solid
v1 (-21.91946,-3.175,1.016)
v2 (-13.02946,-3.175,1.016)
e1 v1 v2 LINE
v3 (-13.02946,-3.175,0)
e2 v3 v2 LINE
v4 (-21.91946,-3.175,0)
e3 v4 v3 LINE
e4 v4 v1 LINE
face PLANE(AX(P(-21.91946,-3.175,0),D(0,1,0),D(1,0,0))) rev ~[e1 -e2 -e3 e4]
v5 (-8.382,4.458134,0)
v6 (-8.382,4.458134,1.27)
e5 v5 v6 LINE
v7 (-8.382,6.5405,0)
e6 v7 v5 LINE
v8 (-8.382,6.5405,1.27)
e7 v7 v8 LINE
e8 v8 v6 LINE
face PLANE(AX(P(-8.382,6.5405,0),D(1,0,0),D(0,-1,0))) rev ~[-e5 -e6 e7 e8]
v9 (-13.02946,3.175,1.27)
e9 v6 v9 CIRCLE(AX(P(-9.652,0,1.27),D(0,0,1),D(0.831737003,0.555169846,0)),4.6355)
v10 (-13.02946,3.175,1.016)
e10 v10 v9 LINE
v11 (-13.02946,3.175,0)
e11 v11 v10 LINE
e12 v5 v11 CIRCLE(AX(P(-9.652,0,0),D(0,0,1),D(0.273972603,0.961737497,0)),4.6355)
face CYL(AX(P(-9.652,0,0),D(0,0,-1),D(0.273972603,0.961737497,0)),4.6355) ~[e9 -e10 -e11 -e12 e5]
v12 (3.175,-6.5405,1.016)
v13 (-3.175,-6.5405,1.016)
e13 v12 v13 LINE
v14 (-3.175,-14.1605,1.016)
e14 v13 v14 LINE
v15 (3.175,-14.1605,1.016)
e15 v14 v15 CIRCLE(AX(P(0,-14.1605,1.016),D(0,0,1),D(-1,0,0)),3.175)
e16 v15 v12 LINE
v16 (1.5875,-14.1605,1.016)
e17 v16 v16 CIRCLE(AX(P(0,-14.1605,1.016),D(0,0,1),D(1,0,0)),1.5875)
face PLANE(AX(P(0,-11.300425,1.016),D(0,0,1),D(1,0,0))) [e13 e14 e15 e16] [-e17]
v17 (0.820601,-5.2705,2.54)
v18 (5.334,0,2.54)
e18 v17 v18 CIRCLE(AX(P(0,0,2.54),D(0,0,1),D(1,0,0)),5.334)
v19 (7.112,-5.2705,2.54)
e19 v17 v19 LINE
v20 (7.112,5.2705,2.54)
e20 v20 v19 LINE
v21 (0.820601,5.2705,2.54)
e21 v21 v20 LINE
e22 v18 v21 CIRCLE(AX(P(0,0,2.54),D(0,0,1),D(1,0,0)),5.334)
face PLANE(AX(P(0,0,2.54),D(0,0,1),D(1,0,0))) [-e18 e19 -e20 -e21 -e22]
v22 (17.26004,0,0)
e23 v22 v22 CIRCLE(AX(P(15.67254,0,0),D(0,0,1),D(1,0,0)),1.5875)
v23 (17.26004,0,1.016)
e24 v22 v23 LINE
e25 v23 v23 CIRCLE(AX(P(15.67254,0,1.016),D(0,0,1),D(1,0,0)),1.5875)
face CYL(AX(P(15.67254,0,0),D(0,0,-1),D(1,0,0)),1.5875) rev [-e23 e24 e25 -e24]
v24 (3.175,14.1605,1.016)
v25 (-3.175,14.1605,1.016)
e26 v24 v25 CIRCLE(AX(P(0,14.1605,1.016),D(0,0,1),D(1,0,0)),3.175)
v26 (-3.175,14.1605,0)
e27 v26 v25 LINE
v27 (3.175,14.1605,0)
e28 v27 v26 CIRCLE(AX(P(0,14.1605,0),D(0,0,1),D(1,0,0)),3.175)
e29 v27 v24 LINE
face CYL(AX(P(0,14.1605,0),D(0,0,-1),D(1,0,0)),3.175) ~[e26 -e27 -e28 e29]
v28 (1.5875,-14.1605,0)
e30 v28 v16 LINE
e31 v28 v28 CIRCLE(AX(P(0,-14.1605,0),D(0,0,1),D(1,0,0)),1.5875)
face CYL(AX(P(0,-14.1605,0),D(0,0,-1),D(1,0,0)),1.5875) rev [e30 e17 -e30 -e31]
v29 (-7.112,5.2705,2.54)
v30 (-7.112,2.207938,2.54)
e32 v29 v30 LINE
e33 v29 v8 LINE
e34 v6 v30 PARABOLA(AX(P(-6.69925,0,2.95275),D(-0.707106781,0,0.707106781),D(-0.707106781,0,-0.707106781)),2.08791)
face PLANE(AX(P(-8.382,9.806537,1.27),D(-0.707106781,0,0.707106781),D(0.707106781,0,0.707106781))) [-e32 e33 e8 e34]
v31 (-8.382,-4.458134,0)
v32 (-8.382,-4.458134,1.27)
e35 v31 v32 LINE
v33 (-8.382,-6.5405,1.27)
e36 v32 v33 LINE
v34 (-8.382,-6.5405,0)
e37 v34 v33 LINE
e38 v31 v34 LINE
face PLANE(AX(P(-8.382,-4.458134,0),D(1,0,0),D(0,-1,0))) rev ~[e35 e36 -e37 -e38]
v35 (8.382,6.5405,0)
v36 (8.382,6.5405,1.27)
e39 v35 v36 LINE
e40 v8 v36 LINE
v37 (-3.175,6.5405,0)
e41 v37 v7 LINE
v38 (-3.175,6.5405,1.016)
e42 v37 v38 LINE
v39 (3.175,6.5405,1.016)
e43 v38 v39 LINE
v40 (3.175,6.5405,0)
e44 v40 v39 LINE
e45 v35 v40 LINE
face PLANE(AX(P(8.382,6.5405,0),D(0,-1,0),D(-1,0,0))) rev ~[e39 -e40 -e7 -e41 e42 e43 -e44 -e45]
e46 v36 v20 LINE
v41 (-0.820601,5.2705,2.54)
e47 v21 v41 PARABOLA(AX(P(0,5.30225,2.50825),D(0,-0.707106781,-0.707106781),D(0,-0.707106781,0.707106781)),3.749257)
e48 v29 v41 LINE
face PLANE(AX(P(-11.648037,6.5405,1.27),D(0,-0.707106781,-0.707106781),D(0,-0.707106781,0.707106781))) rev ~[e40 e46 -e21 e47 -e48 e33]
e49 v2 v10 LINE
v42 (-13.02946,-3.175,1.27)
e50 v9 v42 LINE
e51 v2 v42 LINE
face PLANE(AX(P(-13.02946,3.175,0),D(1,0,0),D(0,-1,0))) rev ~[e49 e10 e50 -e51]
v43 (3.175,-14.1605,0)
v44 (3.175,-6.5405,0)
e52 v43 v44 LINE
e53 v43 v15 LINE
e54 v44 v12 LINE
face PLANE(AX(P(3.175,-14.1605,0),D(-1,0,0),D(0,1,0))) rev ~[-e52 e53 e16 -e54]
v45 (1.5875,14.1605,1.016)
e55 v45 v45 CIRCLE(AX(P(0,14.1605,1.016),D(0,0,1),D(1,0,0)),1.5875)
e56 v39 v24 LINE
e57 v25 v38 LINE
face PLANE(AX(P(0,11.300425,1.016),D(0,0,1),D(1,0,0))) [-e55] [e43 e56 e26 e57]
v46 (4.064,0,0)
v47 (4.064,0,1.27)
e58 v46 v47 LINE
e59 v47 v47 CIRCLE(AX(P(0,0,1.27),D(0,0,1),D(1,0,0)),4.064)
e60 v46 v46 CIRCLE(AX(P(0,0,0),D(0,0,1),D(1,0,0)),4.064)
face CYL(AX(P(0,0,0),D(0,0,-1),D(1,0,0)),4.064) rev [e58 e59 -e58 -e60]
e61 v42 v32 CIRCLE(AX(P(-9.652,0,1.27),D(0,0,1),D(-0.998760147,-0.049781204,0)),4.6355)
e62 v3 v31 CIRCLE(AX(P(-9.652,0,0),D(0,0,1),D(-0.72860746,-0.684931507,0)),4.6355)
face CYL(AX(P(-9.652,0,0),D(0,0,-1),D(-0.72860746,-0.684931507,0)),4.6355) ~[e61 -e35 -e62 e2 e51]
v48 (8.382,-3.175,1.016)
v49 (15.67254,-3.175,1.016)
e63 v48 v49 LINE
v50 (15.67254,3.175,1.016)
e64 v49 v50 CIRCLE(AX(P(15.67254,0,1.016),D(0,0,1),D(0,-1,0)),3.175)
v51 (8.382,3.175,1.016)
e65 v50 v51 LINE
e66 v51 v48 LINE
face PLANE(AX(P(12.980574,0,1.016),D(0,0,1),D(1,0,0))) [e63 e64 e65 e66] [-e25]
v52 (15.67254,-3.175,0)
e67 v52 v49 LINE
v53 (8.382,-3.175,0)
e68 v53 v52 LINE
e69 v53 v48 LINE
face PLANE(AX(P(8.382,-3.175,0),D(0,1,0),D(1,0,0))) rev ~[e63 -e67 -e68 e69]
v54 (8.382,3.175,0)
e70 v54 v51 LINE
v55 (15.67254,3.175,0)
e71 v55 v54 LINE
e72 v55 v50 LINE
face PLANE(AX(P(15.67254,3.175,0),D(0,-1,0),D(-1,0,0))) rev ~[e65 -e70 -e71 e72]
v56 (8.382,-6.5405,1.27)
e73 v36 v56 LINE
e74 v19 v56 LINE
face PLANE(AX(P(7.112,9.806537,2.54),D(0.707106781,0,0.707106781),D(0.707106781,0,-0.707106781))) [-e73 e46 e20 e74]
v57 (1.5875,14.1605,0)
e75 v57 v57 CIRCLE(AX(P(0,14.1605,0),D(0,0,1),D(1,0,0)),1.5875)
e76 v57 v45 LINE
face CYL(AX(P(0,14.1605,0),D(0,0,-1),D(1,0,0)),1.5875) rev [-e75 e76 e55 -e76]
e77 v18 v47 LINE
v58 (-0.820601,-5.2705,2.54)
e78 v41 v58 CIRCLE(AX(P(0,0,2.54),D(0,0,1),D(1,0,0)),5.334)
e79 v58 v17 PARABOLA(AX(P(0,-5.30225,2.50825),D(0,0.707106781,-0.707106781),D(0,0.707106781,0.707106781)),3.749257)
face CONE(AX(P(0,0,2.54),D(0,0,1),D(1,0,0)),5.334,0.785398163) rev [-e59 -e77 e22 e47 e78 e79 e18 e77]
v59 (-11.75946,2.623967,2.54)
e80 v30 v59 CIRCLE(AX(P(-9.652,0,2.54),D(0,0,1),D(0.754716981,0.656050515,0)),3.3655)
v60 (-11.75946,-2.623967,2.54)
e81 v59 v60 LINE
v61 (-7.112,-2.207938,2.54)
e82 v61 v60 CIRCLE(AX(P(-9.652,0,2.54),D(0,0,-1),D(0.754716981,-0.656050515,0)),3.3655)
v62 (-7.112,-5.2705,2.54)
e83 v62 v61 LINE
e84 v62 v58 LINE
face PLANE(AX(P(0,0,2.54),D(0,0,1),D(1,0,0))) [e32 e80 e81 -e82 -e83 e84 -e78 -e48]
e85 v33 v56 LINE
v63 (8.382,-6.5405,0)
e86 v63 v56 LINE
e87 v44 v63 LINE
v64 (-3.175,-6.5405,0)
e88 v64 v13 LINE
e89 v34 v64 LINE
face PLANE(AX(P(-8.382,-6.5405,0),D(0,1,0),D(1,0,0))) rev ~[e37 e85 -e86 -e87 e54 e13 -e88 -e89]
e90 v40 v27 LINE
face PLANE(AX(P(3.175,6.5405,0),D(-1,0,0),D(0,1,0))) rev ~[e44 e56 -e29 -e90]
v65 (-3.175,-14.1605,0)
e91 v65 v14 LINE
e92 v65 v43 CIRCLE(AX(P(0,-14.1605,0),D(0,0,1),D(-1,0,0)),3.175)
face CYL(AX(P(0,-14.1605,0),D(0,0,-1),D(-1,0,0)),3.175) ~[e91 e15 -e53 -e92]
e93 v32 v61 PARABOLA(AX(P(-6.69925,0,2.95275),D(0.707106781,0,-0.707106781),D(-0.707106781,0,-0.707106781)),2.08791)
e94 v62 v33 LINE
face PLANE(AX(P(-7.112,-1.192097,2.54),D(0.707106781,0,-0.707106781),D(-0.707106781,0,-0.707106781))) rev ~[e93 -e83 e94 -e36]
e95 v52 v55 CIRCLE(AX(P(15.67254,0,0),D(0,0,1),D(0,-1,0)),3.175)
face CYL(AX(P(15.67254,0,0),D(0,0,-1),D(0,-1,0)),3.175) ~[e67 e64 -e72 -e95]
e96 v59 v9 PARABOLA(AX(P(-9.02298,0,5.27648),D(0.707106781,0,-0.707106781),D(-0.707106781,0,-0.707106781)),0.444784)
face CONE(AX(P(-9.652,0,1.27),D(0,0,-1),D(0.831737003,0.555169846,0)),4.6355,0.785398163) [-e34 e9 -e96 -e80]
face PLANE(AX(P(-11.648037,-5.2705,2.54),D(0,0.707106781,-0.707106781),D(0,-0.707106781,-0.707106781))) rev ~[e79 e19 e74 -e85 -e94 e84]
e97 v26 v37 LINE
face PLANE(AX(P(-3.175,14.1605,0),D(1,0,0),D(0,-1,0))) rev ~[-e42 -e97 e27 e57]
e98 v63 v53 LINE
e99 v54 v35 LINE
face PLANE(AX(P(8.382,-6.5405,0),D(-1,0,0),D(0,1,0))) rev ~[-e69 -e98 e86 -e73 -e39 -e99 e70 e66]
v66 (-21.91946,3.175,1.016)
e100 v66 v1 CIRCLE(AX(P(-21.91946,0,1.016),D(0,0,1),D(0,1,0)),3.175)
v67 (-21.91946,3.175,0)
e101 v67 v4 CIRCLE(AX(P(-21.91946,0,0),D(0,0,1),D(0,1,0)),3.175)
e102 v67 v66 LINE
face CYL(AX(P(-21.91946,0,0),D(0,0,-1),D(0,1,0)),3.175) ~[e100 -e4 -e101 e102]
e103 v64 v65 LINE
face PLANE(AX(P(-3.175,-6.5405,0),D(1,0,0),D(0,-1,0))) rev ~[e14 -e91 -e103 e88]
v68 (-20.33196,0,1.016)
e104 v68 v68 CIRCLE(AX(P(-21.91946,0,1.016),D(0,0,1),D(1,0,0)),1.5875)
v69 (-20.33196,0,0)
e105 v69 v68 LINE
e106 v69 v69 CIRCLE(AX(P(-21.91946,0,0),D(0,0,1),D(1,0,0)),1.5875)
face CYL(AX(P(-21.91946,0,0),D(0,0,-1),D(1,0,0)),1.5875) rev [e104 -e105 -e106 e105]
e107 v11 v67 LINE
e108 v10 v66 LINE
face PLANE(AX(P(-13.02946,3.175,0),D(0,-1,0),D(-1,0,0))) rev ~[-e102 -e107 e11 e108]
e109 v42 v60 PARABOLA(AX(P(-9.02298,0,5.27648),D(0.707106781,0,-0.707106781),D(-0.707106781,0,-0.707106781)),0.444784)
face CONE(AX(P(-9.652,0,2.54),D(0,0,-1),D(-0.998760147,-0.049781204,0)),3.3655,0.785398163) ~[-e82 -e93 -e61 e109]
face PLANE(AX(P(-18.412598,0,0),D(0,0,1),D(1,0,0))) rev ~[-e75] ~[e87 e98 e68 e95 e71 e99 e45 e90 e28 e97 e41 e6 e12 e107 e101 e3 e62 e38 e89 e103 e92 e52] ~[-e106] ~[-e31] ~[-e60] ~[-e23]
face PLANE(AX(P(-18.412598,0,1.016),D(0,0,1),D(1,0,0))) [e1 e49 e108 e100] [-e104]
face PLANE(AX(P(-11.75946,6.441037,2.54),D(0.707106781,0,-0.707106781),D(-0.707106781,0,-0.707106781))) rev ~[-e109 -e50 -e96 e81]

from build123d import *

# Parameters (mm, degrees)
F0_R         = 4.064
F1_DEPTH     = 2.54
F0_R_2       = 1.5875
F2_DEPTH     = 1.016
F3_T1_DEPTH  = 23.2960747894
F3_T3_DEPTH  = 19.6130747894
F3_T5_DEPTH  = 12.8820747894
F3_T10_DEPTH = 8.6144406225
F3_S11_R     = 4.6355
F3_T12_DEPTH = 6
F3_T16_ANGLE = 143.4241535748
F3_T21_ANGLE = 143.4241535748
F3_T26_DEPTH = 8.6144406225
F3_S27_R     = 4.6355
F3_T28_DEPTH = 6
F3_T35_ANGLE = 143.4241535748
F3_T39_DEPTH = 8.6144406225
F3_S40_R     = 4.6355
F3_T41_DEPTH = 6
F3_T47_DEPTH = 8.6144406225
F3_S48_R     = 4.6355
F3_T49_DEPTH = 6
F3_T52_ANGLE = 143.4241535748


# Not quite as in the source:
# - a fillet or chamfer that OpenCascade refuses, or shapes differently, is made with other operations: its cross-section is extruded or revolved along the edge and cut away or added
# - a feature names something its author has since deleted; it is built from what else it names


with BuildPart() as f1:
    # F0 (on Top) → F1 (new body)
    with BuildSketch(Plane.XY):
        Polygon((-8.382, 6.5405), (-8.382, 4.4581341669), (-8.382, -4.4581341669), (-8.382, -6.5405), (-3.175, -6.5405), (3.175, -6.5405), (8.382, -6.5405), (8.382, -3.175), (8.382, 3.175), (8.382, 6.5405), (3.175, 6.5405), (-3.175, 6.5405), align=None)
        Circle(F0_R, mode=Mode.SUBTRACT)
        with BuildLine():
            Line((-8.382, -4.4581341669), (-8.382, 4.4581341669))
            ThreePointArc((-8.382, 4.4581341669), (-10.8856754478, 4.4683224077), (-13.0294598813, 3.175))
            Line((-13.0294598813, 3.175), (-13.0294598813, -3.175))
            ThreePointArc((-13.0294598813, -3.175), (-10.8856754478, -4.4683224077), (-8.382, -4.4581341669))
        make_face()
    extrude(amount=F1_DEPTH)

    # F0 (on Top) → F2 (join)
    with BuildSketch(Plane.XY):
        with BuildLine():
            Line((-13.0294598813, -3.175), (-13.0294598813, 3.175))
            Line((-13.0294598813, 3.175), (-21.9194598813, 3.175))
            ThreePointArc((-21.9194598813, 3.175), (-25.0944598813, 0), (-21.9194598813, -3.175))
            Line((-21.9194598813, -3.175), (-13.0294598813, -3.175))
        make_face()
        with Locations((-21.9194598813, 0)):
            Circle(F0_R_2, mode=Mode.SUBTRACT)
        with BuildLine():
            Line((3.175, -6.5405), (-3.175, -6.5405))
            Line((-3.175, -6.5405), (-3.175, -14.1605))
            ThreePointArc((-3.175, -14.1605), (0, -17.3355), (3.175, -14.1605))
            Line((3.175, -14.1605), (3.175, -6.5405))
        make_face()
        with Locations((0, -14.1605)):
            Circle(F0_R_2, mode=Mode.SUBTRACT)
        with BuildLine():
            Line((-3.175, 14.1605), (-3.175, 6.5405))
            Line((-3.175, 6.5405), (3.175, 6.5405))
            Line((3.175, 6.5405), (3.175, 14.1605))
            ThreePointArc((3.175, 14.1605), (0, 17.3355), (-3.175, 14.1605))
        make_face()
        with Locations((0, 14.1605)):
            Circle(F0_R_2, mode=Mode.SUBTRACT)
        with BuildLine():
            Line((15.6725401187, 3.175), (8.382, 3.175))
            Line((8.382, 3.175), (8.382, -3.175))
            Line((8.382, -3.175), (15.6725401187, -3.175))
            ThreePointArc((15.6725401187, -3.175), (18.8475401187, 0), (15.6725401187, 3.175))
        make_face()
        with Locations((15.6725401187, 0)):
            Circle(F0_R_2, mode=Mode.SUBTRACT)
    extrude(amount=F2_DEPTH)

    # F3: chamfer of 1.27 on 9 edges, made by hand

    # F3_s2 → F3_t1 (cut)
    with BuildSketch(Plane.YZ.offset(-11.6480373947)):
        Polygon((-5.2705, 2.54), (-6.5405, 1.27), (-6.5405, 2.54), align=None)
        Polygon((6.5405, 1.27), (5.2705, 2.54), (6.5405, 2.54), align=None)
    extrude(amount=F3_T1_DEPTH, mode=Mode.SUBTRACT)

    # F3_s4 → F3_t3 (cut)
    with BuildSketch(Plane.XZ.offset(-9.8065373947)):
        Polygon((7.112, 2.54), (8.382, 1.27), (8.382, 2.54), align=None)
    extrude(amount=F3_T3_DEPTH, mode=Mode.SUBTRACT)

    # F3_s6 → F3_t5 (cut)
    with BuildSketch(Plane.XZ.offset(-6.4410373947)):
        Polygon((-11.7594598813, 2.54), (-13.0294598813, 1.27), (-13.0294598813, 2.54), align=None)
    extrude(amount=F3_T5_DEPTH, mode=Mode.SUBTRACT)


with BuildPart() as f3_tool8:
    # F3_s9 → F3_t10 (new body)
    with BuildSketch(Plane.XZ.offset(1.1920967722)):
        Polygon((-7.112, 2.54), (-8.382, 1.27), (-8.382, 2.54), align=None)
    extrude(amount=F3_T10_DEPTH)

    # F3_s11 → F3_t12 (cut, symmetric)
    with BuildSketch(Plane.XY.offset(1.9)):
        with Locations((-9.652, 0)):
            Circle(F3_S11_R)
    extrude(amount=F3_T12_DEPTH, both=True, mode=Mode.SUBTRACT)


with BuildPart() as f1_1:
    add(f1.part)

    # F3_t7: cut F3_tool8
    add(f3_tool8.part, mode=Mode.SUBTRACT)


with BuildPart() as f3_tool14:
    # F3_s15 → F3_t16 (revolve)
    with BuildSketch(Plane(origin=(-0.0239192805, 0.47989245, 0), x_dir=(0, 0, 1), z_dir=(-0.0497812044, 0.9987601472, 0))):
        Polygon((2.54, -13.005532941), (1.27, -14.275532941), (2.54, -14.275532941), align=None)
    revolve(axis=Axis((-9.652, 0, 2.54), (0, 0, 1)), revolution_arc=F3_T16_ANGLE)

    split(bisect_by=Plane.YZ.offset(-8.382), keep=Keep.BOTTOM)


with BuildPart() as f1_2:
    add(f1_1.part)

    # F3_t13: cut F3_tool14
    add(f3_tool14.part, mode=Mode.SUBTRACT)


with BuildPart() as f3_tool19:
    # F3_s20 → F3_t21 (revolve)
    with BuildSketch(Plane(origin=(-2.9748772597, 4.4568621922, 0), x_dir=(0, 0, 1), z_dir=(0.5551698459, -0.831737003, 0))):
        Polygon((1.27, 3.3924255533), (2.54, 4.6624255533), (2.54, 3.3924255533), align=None)
    revolve(axis=Axis((-9.652, 0, 2.54), (0, 0, 1)), revolution_arc=F3_T21_ANGLE)

    split(bisect_by=Plane.YZ.offset(-8.382), keep=Keep.BOTTOM)


with BuildPart() as f1_3:
    add(f1_2.part)

    # F3_t18: cut F3_tool19
    add(f3_tool19.part, mode=Mode.SUBTRACT)


with BuildPart() as f3_tool24:
    # F3_s25 → F3_t26 (new body)
    with BuildSketch(Plane.XZ.offset(-9.8065373947)):
        Polygon((-8.382, 1.27), (-7.112, 2.54), (-8.382, 2.54), align=None)
    extrude(amount=F3_T26_DEPTH)

    # F3_s27 → F3_t28 (cut, symmetric)
    with BuildSketch(Plane.XY.offset(1.9)):
        with Locations((-9.652, 0)):
            Circle(F3_S27_R)
    extrude(amount=F3_T28_DEPTH, both=True, mode=Mode.SUBTRACT)


with BuildPart() as f1_4:
    add(f1_3.part)

    # F3_t23: cut F3_tool24
    add(f3_tool24.part, mode=Mode.SUBTRACT)

    # F3_s29 → F3_t30 (revolve, cut)
    with BuildSketch(Plane.XZ):
        Polygon((5.334, 2.54), (4.064, 1.27), (4.064, 2.54), align=None)
    revolve(axis=Axis((0, 0, 2.54), (0, 0, 1)), mode=Mode.SUBTRACT)


with BuildPart() as f3_tool33:
    # F3_s34 → F3_t35 (revolve)
    with BuildSketch(Plane(origin=(-0.0239192805, 0.47989245, 0), x_dir=(0, 0, 1), z_dir=(-0.0497812044, 0.9987601472, 0))):
        Polygon((2.54, -13.005532941), (1.27, -14.275532941), (2.54, -14.275532941), align=None)
    revolve(axis=Axis((-9.652, 0, 2.54), (0, 0, 1)), revolution_arc=F3_T35_ANGLE)

    split(bisect_by=Plane.YZ.offset(-8.382), keep=Keep.TOP)


with BuildPart() as f3_tool37:
    # F3_s38 → F3_t39 (new body)
    with BuildSketch(Plane.XZ.offset(1.1920967722)):
        Polygon((-7.112, 2.54), (-8.382, 1.27), (-8.382, 2.54), align=None)
    extrude(amount=F3_T39_DEPTH)

    # F3_s40 → F3_t41 (intersect, symmetric)
    with BuildSketch(Plane.XY.offset(1.9)):
        with Locations((-9.652, 0)):
            Circle(F3_S40_R)
    extrude(amount=F3_T41_DEPTH, both=True, mode=Mode.INTERSECT)


with BuildPart() as f3_tool33_1:
    add(f3_tool33.part)

    # F3_t42: intersect F3_tool37
    add(f3_tool37.part, mode=Mode.INTERSECT)


with BuildPart() as f1_5:
    add(f1_4.part)

    # F3_t31: cut F3_tool33
    add(f3_tool33_1.part, mode=Mode.SUBTRACT)


with BuildPart() as f3_tool45:
    # F3_s46 → F3_t47 (new body)
    with BuildSketch(Plane.XZ.offset(-9.8065373947)):
        Polygon((-8.382, 1.27), (-7.112, 2.54), (-8.382, 2.54), align=None)
    extrude(amount=F3_T47_DEPTH)

    # F3_s48 → F3_t49 (intersect, symmetric)
    with BuildSketch(Plane.XY.offset(1.9)):
        with Locations((-9.652, 0)):
            Circle(F3_S48_R)
    extrude(amount=F3_T49_DEPTH, both=True, mode=Mode.INTERSECT)


with BuildPart() as f3_tool50:
    # F3_s51 → F3_t52 (revolve)
    with BuildSketch(Plane(origin=(-2.9748772597, 4.4568621922, 0), x_dir=(0, 0, 1), z_dir=(0.5551698459, -0.831737003, 0))):
        Polygon((1.27, 3.3924255533), (2.54, 4.6624255533), (2.54, 3.3924255533), align=None)
    revolve(axis=Axis((-9.652, 0, 2.54), (0, 0, 1)), revolution_arc=F3_T52_ANGLE)

    split(bisect_by=Plane.YZ.offset(-8.382), keep=Keep.TOP)


with BuildPart() as f3_tool45_1:
    add(f3_tool45.part)

    # F3_t54: intersect F3_tool50
    add(f3_tool50.part, mode=Mode.INTERSECT)


with BuildPart() as f1_6:
    add(f1_5.part)

    # F3_t43: cut F3_tool45
    add(f3_tool45_1.part, mode=Mode.SUBTRACT)


solid = f1_6.part
